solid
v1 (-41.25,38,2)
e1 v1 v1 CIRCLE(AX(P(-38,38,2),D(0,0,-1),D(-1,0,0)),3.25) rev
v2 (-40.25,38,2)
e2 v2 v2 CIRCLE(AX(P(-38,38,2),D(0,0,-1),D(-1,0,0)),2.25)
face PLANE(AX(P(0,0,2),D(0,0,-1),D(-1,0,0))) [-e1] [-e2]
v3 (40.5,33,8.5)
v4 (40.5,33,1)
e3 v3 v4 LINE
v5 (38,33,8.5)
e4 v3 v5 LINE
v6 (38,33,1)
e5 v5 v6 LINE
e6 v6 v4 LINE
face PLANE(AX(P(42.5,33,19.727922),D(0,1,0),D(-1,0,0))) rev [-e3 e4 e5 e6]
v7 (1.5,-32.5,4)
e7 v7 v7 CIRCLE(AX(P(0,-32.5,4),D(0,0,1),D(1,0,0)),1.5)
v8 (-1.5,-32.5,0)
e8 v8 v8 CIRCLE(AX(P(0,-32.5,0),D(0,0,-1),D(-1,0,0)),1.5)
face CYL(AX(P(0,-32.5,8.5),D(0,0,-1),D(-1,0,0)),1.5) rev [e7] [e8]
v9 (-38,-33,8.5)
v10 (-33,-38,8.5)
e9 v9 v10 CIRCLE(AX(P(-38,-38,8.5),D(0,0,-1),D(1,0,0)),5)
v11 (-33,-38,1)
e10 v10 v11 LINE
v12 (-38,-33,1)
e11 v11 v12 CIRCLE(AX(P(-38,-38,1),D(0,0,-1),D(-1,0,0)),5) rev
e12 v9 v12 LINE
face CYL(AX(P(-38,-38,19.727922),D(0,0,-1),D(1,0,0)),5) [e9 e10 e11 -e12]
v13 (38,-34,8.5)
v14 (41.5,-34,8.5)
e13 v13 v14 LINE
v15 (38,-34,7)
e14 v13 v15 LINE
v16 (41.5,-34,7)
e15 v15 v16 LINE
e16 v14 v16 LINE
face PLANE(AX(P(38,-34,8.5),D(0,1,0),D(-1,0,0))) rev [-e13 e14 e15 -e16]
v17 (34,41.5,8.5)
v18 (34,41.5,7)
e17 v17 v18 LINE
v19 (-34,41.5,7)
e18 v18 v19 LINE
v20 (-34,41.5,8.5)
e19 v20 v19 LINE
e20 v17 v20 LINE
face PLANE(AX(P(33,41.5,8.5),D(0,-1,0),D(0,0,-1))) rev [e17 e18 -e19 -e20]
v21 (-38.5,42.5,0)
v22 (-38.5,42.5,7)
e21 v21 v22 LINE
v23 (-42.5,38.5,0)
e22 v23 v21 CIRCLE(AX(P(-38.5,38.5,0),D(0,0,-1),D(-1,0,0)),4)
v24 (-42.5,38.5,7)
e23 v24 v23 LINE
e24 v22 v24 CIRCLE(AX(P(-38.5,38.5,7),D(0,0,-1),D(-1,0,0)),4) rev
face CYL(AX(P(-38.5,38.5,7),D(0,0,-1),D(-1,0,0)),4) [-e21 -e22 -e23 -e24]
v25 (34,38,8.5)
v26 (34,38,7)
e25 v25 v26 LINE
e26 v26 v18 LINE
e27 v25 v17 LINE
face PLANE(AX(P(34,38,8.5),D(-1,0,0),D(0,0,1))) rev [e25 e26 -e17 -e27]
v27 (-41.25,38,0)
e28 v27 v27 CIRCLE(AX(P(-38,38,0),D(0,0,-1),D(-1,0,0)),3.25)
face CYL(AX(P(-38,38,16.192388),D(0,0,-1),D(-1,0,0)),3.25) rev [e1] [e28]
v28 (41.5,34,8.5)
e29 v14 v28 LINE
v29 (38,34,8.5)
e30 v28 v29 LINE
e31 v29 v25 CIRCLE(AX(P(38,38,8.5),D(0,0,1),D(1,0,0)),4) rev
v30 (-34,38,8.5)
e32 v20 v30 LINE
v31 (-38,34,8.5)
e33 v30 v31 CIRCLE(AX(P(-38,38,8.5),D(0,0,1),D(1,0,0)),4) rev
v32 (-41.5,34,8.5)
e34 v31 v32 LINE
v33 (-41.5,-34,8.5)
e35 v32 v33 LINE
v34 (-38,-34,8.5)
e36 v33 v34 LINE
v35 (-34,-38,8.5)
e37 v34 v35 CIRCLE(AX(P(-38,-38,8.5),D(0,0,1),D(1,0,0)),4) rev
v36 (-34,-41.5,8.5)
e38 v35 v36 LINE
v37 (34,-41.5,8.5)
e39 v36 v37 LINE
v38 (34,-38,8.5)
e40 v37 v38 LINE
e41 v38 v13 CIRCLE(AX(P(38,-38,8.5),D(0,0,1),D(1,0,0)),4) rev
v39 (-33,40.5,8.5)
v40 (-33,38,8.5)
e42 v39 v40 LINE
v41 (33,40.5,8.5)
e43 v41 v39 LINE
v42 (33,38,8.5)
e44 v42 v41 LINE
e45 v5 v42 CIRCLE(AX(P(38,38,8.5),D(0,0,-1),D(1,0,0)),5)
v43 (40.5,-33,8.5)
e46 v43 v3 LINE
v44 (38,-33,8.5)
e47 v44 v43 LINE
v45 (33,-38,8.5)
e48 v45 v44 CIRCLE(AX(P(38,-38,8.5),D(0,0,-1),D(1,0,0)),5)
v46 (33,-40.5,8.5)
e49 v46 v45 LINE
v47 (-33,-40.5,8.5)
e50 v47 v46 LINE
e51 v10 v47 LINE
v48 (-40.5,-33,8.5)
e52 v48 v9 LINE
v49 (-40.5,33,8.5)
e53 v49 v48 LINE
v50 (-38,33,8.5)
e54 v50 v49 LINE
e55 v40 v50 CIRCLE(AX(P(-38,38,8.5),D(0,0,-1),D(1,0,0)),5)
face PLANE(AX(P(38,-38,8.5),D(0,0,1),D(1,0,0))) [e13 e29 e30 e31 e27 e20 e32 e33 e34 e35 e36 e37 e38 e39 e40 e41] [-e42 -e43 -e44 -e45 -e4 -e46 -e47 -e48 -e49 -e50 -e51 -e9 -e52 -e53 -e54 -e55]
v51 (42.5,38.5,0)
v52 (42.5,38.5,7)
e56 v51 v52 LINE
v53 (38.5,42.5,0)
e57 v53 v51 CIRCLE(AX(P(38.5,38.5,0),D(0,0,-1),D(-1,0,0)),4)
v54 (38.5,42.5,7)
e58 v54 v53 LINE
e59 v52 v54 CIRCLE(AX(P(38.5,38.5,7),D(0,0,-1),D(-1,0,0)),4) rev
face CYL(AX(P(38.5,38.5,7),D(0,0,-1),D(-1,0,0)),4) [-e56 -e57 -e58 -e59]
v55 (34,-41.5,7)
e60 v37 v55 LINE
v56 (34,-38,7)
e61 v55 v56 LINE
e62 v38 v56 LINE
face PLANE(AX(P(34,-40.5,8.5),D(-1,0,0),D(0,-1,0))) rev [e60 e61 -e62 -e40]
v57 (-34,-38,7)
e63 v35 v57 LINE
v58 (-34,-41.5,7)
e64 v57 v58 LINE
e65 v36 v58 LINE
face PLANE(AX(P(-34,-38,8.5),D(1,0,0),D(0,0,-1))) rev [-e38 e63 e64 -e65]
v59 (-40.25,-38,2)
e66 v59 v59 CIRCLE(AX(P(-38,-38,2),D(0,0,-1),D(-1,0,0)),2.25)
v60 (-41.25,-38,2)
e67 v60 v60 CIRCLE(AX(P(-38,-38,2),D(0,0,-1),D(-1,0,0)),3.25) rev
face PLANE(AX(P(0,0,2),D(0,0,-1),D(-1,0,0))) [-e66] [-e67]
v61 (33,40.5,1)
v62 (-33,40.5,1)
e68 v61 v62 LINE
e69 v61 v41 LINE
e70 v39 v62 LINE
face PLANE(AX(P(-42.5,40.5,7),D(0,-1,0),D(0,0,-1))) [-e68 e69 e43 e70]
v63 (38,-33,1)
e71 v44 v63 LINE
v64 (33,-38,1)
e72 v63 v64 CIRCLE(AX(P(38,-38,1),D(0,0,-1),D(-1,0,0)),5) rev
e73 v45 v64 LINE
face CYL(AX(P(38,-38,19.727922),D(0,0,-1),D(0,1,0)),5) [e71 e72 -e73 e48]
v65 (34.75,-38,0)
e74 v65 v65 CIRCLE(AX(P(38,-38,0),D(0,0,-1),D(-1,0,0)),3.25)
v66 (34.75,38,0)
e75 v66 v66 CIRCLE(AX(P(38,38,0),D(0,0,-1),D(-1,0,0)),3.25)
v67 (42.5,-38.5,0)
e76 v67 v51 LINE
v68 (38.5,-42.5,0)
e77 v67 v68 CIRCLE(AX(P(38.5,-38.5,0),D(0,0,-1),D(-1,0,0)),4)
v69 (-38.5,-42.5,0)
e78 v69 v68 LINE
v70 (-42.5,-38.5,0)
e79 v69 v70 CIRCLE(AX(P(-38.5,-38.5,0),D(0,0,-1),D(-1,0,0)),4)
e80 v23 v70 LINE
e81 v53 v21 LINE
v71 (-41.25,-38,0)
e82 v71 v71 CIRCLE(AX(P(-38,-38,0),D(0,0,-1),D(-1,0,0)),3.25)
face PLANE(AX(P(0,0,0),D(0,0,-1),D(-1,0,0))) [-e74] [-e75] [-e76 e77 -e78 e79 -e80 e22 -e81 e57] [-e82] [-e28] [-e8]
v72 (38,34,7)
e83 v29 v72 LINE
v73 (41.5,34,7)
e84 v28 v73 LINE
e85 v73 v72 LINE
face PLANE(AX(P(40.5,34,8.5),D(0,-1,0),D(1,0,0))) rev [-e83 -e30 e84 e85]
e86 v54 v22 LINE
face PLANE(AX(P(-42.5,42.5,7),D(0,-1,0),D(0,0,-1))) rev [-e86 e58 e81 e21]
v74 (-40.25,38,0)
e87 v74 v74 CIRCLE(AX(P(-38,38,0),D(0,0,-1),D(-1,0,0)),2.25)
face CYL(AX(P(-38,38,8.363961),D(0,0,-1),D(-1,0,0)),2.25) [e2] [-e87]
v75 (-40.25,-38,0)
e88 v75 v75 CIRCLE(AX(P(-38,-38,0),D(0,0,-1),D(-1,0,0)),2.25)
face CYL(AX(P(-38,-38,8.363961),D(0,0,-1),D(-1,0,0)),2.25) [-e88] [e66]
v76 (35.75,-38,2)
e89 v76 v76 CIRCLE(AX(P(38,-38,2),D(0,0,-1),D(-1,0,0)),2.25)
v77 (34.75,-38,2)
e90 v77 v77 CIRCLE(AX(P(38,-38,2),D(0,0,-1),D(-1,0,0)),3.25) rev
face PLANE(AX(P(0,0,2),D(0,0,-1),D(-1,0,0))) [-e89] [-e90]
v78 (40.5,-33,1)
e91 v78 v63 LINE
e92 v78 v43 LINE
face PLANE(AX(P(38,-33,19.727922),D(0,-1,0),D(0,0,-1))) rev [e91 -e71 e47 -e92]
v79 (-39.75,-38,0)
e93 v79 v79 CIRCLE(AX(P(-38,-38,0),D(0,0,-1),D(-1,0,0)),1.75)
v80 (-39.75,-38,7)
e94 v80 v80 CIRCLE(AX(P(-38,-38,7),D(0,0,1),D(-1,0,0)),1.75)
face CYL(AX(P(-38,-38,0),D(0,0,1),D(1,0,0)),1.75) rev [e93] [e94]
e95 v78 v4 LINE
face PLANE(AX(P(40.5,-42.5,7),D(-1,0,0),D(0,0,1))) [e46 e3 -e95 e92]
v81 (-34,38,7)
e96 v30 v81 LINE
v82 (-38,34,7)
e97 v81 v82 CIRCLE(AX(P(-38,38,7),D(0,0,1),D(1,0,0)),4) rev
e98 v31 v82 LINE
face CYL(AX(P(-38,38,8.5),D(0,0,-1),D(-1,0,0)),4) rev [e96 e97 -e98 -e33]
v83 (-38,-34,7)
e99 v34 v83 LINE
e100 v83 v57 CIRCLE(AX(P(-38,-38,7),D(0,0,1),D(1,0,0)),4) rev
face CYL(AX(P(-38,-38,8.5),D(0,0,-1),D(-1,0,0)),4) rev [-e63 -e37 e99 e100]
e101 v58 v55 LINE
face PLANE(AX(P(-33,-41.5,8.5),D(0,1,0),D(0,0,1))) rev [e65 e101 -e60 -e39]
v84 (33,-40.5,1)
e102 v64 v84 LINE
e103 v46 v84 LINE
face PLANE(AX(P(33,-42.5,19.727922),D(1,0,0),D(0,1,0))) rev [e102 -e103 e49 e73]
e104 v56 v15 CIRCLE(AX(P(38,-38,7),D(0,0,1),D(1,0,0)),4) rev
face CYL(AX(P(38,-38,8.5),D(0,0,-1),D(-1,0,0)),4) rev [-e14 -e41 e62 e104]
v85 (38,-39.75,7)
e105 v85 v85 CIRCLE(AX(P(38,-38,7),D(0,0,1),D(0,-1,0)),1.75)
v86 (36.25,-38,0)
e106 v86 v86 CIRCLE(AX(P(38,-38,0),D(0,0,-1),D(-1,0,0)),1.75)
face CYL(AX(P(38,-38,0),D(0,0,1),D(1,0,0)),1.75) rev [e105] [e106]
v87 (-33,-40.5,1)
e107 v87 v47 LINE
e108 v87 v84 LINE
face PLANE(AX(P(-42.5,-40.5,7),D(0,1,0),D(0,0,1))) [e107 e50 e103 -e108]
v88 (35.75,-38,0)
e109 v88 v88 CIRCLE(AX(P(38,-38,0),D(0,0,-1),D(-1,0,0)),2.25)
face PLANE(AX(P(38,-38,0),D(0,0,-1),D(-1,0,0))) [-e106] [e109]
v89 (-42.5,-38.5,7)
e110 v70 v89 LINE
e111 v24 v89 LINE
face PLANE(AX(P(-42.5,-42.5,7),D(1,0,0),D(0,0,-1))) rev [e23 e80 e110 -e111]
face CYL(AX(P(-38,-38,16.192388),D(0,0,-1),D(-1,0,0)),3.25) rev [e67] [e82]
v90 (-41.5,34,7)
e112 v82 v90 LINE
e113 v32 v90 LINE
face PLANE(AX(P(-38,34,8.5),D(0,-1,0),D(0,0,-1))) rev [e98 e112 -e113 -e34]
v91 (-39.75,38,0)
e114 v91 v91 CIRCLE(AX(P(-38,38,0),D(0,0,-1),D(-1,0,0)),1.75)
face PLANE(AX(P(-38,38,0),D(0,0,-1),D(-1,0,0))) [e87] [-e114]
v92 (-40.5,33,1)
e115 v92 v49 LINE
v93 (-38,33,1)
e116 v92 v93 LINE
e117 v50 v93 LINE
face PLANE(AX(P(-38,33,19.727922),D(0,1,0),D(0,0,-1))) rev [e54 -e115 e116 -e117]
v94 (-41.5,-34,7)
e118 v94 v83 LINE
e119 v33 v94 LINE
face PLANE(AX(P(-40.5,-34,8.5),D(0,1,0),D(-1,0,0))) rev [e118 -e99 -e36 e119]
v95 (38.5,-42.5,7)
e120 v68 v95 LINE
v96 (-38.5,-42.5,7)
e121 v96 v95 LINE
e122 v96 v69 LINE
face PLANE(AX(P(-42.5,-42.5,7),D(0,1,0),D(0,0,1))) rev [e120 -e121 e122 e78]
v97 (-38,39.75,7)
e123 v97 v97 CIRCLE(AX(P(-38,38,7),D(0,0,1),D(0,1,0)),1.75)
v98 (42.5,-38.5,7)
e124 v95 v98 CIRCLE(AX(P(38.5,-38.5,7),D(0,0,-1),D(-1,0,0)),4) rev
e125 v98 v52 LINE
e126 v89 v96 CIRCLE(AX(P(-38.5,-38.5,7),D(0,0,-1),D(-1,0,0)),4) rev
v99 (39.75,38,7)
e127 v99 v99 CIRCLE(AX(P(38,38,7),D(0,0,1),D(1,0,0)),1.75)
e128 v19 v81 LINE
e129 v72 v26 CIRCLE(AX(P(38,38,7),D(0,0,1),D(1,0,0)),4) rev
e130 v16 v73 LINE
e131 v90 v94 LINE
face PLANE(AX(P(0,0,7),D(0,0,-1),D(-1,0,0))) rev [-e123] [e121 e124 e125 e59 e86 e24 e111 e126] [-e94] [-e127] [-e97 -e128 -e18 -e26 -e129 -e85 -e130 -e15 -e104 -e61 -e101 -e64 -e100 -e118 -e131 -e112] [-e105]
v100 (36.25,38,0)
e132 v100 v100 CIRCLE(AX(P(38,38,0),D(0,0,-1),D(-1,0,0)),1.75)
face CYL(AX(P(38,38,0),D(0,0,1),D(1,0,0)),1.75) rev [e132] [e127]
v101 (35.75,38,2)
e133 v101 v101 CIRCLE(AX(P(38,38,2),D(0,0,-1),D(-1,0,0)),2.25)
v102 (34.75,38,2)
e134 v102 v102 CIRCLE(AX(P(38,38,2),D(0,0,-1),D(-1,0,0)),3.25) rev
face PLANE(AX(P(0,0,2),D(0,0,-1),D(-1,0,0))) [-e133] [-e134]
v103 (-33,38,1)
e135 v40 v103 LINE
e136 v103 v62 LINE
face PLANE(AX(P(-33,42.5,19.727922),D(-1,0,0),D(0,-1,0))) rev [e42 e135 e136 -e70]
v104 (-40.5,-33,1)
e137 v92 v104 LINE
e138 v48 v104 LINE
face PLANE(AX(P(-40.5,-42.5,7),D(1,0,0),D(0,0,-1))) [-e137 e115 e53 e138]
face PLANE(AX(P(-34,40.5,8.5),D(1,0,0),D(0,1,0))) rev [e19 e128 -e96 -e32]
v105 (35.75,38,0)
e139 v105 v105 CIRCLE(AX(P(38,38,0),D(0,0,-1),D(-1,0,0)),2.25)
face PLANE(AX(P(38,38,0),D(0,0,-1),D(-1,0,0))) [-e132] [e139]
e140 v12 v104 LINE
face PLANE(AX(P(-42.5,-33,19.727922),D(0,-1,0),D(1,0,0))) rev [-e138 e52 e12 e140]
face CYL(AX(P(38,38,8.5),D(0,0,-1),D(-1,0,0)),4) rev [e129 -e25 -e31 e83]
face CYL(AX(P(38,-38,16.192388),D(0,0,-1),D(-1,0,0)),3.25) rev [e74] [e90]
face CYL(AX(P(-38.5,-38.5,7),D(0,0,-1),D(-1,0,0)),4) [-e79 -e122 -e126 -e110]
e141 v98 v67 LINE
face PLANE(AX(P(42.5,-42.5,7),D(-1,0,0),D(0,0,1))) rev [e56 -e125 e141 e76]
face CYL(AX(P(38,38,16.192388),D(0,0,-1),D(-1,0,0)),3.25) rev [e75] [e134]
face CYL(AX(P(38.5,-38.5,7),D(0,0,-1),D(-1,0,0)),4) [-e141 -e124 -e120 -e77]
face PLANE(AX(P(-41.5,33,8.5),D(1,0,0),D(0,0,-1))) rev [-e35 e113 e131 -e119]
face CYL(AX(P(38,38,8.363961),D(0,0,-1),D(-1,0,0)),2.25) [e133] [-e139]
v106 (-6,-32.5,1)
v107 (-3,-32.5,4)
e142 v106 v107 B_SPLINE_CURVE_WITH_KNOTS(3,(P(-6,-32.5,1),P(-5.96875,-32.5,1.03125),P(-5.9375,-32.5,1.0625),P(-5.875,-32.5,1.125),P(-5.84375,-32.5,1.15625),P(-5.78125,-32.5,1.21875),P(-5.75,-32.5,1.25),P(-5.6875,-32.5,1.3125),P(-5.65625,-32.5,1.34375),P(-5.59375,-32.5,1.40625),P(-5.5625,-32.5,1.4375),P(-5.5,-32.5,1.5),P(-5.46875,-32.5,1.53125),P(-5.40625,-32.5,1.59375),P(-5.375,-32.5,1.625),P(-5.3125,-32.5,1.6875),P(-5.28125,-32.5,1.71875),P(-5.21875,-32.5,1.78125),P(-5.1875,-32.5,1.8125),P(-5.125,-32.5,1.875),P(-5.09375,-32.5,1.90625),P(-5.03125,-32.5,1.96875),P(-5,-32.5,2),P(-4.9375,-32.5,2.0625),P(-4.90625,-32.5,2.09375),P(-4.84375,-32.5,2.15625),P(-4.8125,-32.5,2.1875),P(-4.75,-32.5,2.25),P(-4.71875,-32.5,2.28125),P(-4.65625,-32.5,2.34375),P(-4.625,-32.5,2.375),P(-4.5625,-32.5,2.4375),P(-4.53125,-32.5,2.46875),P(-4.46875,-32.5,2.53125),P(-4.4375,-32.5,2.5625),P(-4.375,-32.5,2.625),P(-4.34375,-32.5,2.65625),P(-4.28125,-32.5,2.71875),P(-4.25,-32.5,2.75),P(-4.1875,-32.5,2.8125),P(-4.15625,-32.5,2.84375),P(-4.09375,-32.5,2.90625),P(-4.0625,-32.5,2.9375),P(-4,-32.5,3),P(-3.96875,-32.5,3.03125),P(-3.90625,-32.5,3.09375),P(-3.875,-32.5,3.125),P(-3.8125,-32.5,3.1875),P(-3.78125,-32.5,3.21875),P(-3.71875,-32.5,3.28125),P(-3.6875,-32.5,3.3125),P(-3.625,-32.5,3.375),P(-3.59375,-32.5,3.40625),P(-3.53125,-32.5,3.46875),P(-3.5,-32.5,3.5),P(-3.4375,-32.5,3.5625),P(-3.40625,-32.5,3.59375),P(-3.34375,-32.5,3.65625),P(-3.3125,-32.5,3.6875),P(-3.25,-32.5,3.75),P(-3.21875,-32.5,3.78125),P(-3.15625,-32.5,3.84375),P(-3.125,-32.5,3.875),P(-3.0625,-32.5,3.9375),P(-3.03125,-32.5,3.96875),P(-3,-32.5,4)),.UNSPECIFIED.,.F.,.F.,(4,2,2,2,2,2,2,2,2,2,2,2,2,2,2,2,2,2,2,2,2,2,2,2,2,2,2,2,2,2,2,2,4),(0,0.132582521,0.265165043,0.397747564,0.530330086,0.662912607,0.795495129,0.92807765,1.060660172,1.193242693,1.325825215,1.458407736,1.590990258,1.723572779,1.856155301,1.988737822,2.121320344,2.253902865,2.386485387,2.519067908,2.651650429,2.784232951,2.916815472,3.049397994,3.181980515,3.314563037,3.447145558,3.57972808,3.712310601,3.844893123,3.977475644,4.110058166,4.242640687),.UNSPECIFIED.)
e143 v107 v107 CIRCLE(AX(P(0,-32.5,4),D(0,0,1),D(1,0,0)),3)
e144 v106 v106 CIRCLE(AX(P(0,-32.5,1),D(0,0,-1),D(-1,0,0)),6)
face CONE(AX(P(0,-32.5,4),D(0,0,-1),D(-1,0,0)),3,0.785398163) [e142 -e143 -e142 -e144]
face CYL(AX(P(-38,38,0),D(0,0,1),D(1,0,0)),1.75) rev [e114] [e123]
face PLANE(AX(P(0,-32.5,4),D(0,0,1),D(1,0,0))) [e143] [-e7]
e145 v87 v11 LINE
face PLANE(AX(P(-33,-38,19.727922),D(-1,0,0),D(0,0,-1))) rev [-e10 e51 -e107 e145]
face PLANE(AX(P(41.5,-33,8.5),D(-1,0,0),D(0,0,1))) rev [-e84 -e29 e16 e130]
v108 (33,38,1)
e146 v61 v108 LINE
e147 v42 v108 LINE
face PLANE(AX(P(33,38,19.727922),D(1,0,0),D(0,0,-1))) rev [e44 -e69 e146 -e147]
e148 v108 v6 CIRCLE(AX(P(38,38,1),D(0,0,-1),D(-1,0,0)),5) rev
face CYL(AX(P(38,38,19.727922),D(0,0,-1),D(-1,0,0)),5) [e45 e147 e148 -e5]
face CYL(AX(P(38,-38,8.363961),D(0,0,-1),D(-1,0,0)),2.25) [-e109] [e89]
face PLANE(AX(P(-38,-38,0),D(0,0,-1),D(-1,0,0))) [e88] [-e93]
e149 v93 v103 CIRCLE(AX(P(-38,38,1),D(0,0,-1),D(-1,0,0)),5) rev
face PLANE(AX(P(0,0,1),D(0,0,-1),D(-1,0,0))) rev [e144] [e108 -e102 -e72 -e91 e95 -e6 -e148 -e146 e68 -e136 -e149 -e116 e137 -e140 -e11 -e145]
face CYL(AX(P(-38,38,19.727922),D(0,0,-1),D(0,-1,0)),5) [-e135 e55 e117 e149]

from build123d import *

# Parameters (mm, degrees)
SKETCH1_W                = 85
SKETCH1_H                = 85
BOSS_EXTRUDE1_DEPTH      = 7
FILLET1_R                = 4
SHELL1_T                 = -2
SHELL1_THICKNESS_2_DEPTH = 1
BOSS_EXTRUDE2_START      = 1
BOSS_EXTRUDE2_DEPTH      = 6
CIRPATTERN5_COUNT        = 4
SKETCH4_R                = 1.75
CUT_EXTRUDE1_DEPTH       = 61.510329697
MOVE_FACE1_BY            = 0.5
MOVE_FACE1_2_BY          = 0.5
MOVE_FACE1_3_BY          = 0.5
MOVE_FACE1_4_BY          = 0.5
MOVE_FACE1_5_BY          = 0.5
MOVE_FACE1_6_BY          = 0.5
MOVE_FACE1_7_BY          = 0.5
MOVE_FACE1_8_BY          = 0.5
MOVE_FACE1_9_BY          = 0.5
MOVE_FACE1_10_BY         = 0.5
MOVE_FACE1_11_BY         = 0.5
MOVE_FACE1_12_BY         = 0.5
EXTRUDE_THIN1_DEPTH      = 1.5
CIRPATTERN6_COUNT        = 4
SKETCH15_R               = 3.25
CUT_EXTRUDE5_DEPTH       = 2
EXTRUDE_THIN2_START      = -2
SKETCH16_R               = 2.25
SKETCH16_R_2             = 1.75
EXTRUDE_THIN2_DEPTH      = 2
SKETCH17_R               = 1.5
CUT_EXTRUDE6_DEPTH       = 61.702141643
SKETCH22_R               = 3
SKETCH22_R_2             = 1.5
BOSS_EXTRUDE5_DEPTH      = 3
CHAMFER2_SIZE            = 3


with BuildPart() as part:
    # Sketch1 → Boss-Extrude1 (new body)
    with BuildSketch(Plane.XY):
        Rectangle(SKETCH1_W, SKETCH1_H)
    extrude(amount=BOSS_EXTRUDE1_DEPTH)

    # Fillet1
    fillet1_edges = [part.edges().sort_by_distance(p)[0] for p in [
        (42.5, -42.5, 3.5),
        (-42.5, -42.5, 3.5),
        (-42.5, 42.5, 3.5),
        (42.5, 42.5, 3.5),
    ]]
    fillet(fillet1_edges, radius=FILLET1_R)

    # Shell1
    shell1_openings = [part.faces().sort_by_distance(p)[0] for p in [
        (0, 0, 7),
    ]]
    offset(amount=SHELL1_T, openings=shell1_openings, kind=Kind.INTERSECTION)

    # Shell1 thickness 2 face (on inner face of the shell) → Shell1 thickness 2 (cut)
    with BuildSketch(Plane(origin=(0, 0, 2), x_dir=(-1, 0, 0), z_dir=(0, 0, -1))):
        with BuildLine():
            ThreePointArc((40.5, -38.5), (39.914213562, -39.914213562), (38.5, -40.5))
            Line((38.5, -40.5), (-38.5, -40.5))
            ThreePointArc((-38.5, -40.5), (-39.914213562, -39.914213562), (-40.5, -38.5))
            Line((-40.5, -38.5), (-40.5, 38.5))
            ThreePointArc((-40.5, 38.5), (-39.914213562, 39.914213562), (-38.5, 40.5))
            Line((-38.5, 40.5), (38.5, 40.5))
            ThreePointArc((38.5, 40.5), (39.914213562, 39.914213562), (40.5, 38.5))
            Line((40.5, 38.5), (40.5, -38.5))
        make_face()
    extrude(amount=SHELL1_THICKNESS_2_DEPTH, mode=Mode.SUBTRACT)


with BuildPart() as body_2:
    # Sketch3 → Boss-Extrude2 (new body)
    with BuildSketch(Plane.XY.offset(BOSS_EXTRUDE2_START)):
        with BuildLine():
            Line((33.5, 38), (33.5, 42.5))
            Line((33.5, 42.5), (38, 42.5))
            ThreePointArc((38, 42.5), (41.181980515, 41.181980515), (42.5, 38))
            Line((42.5, 38), (42.5, 33.5))
            Line((42.5, 33.5), (38, 33.5))
            ThreePointArc((38, 33.5), (34.818019485, 34.818019485), (33.5, 38))
        make_face()
    extrude(amount=BOSS_EXTRUDE2_DEPTH)


with BuildPart() as cirpattern5_1:
    # CirPattern5: pattern copy
    add(body_2.part.rotate(Axis((0, 0, 0), (0, 0, 1)), 1 * 360 / CIRPATTERN5_COUNT))


with BuildPart() as cirpattern5_2:
    # CirPattern5: pattern copy
    add(body_2.part.rotate(Axis((0, 0, 0), (0, 0, 1)), 2 * 360 / CIRPATTERN5_COUNT))


with BuildPart() as cirpattern5_3:
    # CirPattern5: pattern copy
    add(body_2.part.rotate(Axis((0, 0, 0), (0, 0, 1)), 3 * 360 / CIRPATTERN5_COUNT))


with BuildPart() as part_1:
    add(part.part)

    # Combine1: union CirPattern5_1, body 2, CirPattern5_2, CirPattern5_3
    add(cirpattern5_1.part)
    add(body_2.part)
    add(cirpattern5_2.part)
    add(cirpattern5_3.part)

    # Sketch4 → Cut-Extrude1 (cut, through all)
    with BuildSketch(Plane.XY.offset(7)):
        with Locations((38, 38)):
            Circle(SKETCH4_R)
    cut_extrude1 = extrude(amount=-CUT_EXTRUDE1_DEPTH, mode=Mode.SUBTRACT)

    # Move Face1: a face moved outward by 0.5
    extrude(part_1.faces().sort_by_distance((-33.5, 39.25, 4))[0], amount=MOVE_FACE1_BY, dir=(1, 0, 0))

    # Move Face1 2: a curved face moved outward by 0.5
    add(Solid.thicken(part_1.faces().sort_by_distance((-34.818019485, 34.818019485, 4))[0], MOVE_FACE1_2_BY))

    # Move Face1 3: a face moved outward by 0.5
    extrude(part_1.faces().sort_by_distance((-39.25, 33.5, 4))[0], amount=MOVE_FACE1_3_BY, dir=(0, -1, 0))

    # Move Face1 4: a face moved outward by 0.5
    extrude(part_1.faces().sort_by_distance((-33.5, -39.25, 4))[0], amount=MOVE_FACE1_4_BY, dir=(1, 0, 0))

    # Move Face1 5: a face moved outward by 0.5
    extrude(part_1.faces().sort_by_distance((-39.25, -33.5, 4))[0], amount=MOVE_FACE1_5_BY, dir=(0, 1, 0))

    # Move Face1 6: a curved face moved outward by 0.5
    add(Solid.thicken(part_1.faces().sort_by_distance((-34.818019485, -34.818019485, 4))[0], MOVE_FACE1_6_BY))

    # Move Face1 7: a face moved outward by 0.5
    extrude(part_1.faces().sort_by_distance((33.5, -39.25, 4))[0], amount=MOVE_FACE1_7_BY, dir=(-1, 0, 0))

    # Move Face1 8: a curved face moved outward by 0.5
    add(Solid.thicken(part_1.faces().sort_by_distance((34.818019485, -34.818019485, 4))[0], MOVE_FACE1_8_BY))

    # Move Face1 9: a face moved outward by 0.5
    extrude(part_1.faces().sort_by_distance((39.25, -33.5, 4))[0], amount=MOVE_FACE1_9_BY, dir=(0, 1, 0))

    # Move Face1 10: a face moved outward by 0.5
    extrude(part_1.faces().sort_by_distance((39.25, 33.5, 4))[0], amount=MOVE_FACE1_10_BY, dir=(0, -1, 0))

    # Move Face1 11: a face moved outward by 0.5
    extrude(part_1.faces().sort_by_distance((33.5, 39.25, 4))[0], amount=MOVE_FACE1_11_BY, dir=(-1, 0, 0))

    # Move Face1 12: a curved face moved outward by 0.5
    add(Solid.thicken(part_1.faces().sort_by_distance((34.818019485, 34.818019485, 4))[0], MOVE_FACE1_12_BY))

    # Sketch7 → Extrude-Thin1 (add)
    with BuildSketch(Plane.XY.offset(7)):
        with BuildLine():
            Line((38, -34), (41.5, -34))
            Line((41.5, -34), (41.5, 34))
            Line((41.5, 34), (38, 34))
            ThreePointArc((38, 34), (35.171572875, 35.171572875), (34, 38))
            Line((34, 38), (34, 41.5))
            Line((34, 41.5), (-34, 41.5))
            Line((-34, 41.5), (-34, 38))
            ThreePointArc((-34, 38), (-35.171572875, 35.171572875), (-38, 34))
            Line((-38, 34), (-41.5, 34))
            Line((-41.5, 34), (-41.5, -34))
            Line((-41.5, -34), (-38, -34))
            ThreePointArc((-38, -34), (-35.171572875, -35.171572875), (-34, -38))
            Line((-34, -38), (-34, -41.5))
            Line((-34, -41.5), (34, -41.5))
            Line((34, -41.5), (34, -38))
            ThreePointArc((34, -38), (35.171572875, -35.171572875), (38, -34))
        make_face()
        with BuildLine():
            Line((38, -33), (40.5, -33))
            Line((40.5, -33), (40.5, 33))
            Line((40.5, 33), (38, 33))
            ThreePointArc((38, 33), (34.464466094, 34.464466094), (33, 38))
            Line((33, 38), (33, 40.5))
            Line((33, 40.5), (-33, 40.5))
            Line((-33, 40.5), (-33, 38))
            ThreePointArc((-33, 38), (-34.464466094, 34.464466094), (-38, 33))
            Line((-38, 33), (-40.5, 33))
            Line((-40.5, 33), (-40.5, -33))
            Line((-40.5, -33), (-38, -33))
            ThreePointArc((-38, -33), (-34.464466094, -34.464466094), (-33, -38))
            Line((-33, -38), (-33, -40.5))
            Line((-33, -40.5), (33, -40.5))
            Line((33, -40.5), (33, -38))
            ThreePointArc((33, -38), (34.464466094, -34.464466094), (38, -33))
        make_face(mode=Mode.SUBTRACT)
    extrude(amount=EXTRUDE_THIN1_DEPTH)

    # CirPattern6: Cut-Extrude1 ×4 about axis
    cirpattern6_axis = Axis((0, 0, 0), (0, 0, 1))
    for i in range(1, CIRPATTERN6_COUNT):
        add(cut_extrude1.rotate(cirpattern6_axis, i * 360 / CIRPATTERN6_COUNT), mode=Mode.SUBTRACT)

    # Sketch15 → Cut-Extrude5 (cut)
    with BuildSketch(Plane(origin=(0, 0, 0), x_dir=(-1, 0, 0), z_dir=(0, 0, -1))):
        with Locations((-38, -38)):
            Circle(SKETCH15_R)
        with Locations((38, -38)):
            Circle(SKETCH15_R)
        with Locations((38, 38)):
            Circle(SKETCH15_R)
        with Locations((-38, 38)):
            Circle(SKETCH15_R)
    extrude(amount=-CUT_EXTRUDE5_DEPTH, mode=Mode.SUBTRACT)

    # Sketch16 → Extrude-Thin2 (add)
    # profile 1 of 4: a face of its own
    with BuildSketch(Plane(origin=(0, 0, 0), x_dir=(-1, 0, 0), z_dir=(0, 0, -1)).offset(EXTRUDE_THIN2_START)):
        with Locations((-38, -38)):
            Circle(SKETCH16_R)
        with Locations((-38, -38)):
            Circle(SKETCH16_R_2, mode=Mode.SUBTRACT)
    # profile 2 of 4: a face of its own
    with BuildSketch(Plane(origin=(0, 0, 0), x_dir=(-1, 0, 0), z_dir=(0, 0, -1)).offset(EXTRUDE_THIN2_START)):
        with Locations((-38, 38)):
            Circle(SKETCH16_R)
        with Locations((-38, 38)):
            Circle(SKETCH16_R_2, mode=Mode.SUBTRACT)
    # profile 3 of 4: a face of its own
    with BuildSketch(Plane(origin=(0, 0, 0), x_dir=(-1, 0, 0), z_dir=(0, 0, -1)).offset(EXTRUDE_THIN2_START)):
        with Locations((38, -38)):
            Circle(SKETCH16_R)
        with Locations((38, -38)):
            Circle(SKETCH16_R_2, mode=Mode.SUBTRACT)
    # profile 4 of 4: a face of its own
    with BuildSketch(Plane(origin=(0, 0, 0), x_dir=(-1, 0, 0), z_dir=(0, 0, -1)).offset(EXTRUDE_THIN2_START)):
        with Locations((38, 38)):
            Circle(SKETCH16_R)
        with Locations((38, 38)):
            Circle(SKETCH16_R_2, mode=Mode.SUBTRACT)
    extrude(amount=EXTRUDE_THIN2_DEPTH)

    # Sketch17 → Cut-Extrude6 (cut, through all)
    with BuildSketch(Plane(origin=(0, 0, 0), x_dir=(-1, 0, 0), z_dir=(0, 0, -1))):
        with Locations((0, -32.5)):
            Circle(SKETCH17_R)
    extrude(amount=-CUT_EXTRUDE6_DEPTH, mode=Mode.SUBTRACT)

    # Sketch22 → Boss-Extrude5 (add)
    with BuildSketch(Plane.XY.offset(1)):
        with Locations(Location((0, -32.5, 0), (0, 0, 180))):
            Circle(SKETCH22_R)
        with Locations(Location((0, -32.5, 0), (0, 0, 180))):
            Circle(SKETCH22_R_2, mode=Mode.SUBTRACT)
    extrude(amount=BOSS_EXTRUDE5_DEPTH)

    # Chamfer2
    chamfer2_edges = [part_1.edges().sort_by_distance(p)[0] for p in [
        (3, -32.5, 1),
    ]]
    chamfer(chamfer2_edges, length=CHAMFER2_SIZE - 0.0001)  # a hair under: the kernel refuses the full size


solid = part_1.part
